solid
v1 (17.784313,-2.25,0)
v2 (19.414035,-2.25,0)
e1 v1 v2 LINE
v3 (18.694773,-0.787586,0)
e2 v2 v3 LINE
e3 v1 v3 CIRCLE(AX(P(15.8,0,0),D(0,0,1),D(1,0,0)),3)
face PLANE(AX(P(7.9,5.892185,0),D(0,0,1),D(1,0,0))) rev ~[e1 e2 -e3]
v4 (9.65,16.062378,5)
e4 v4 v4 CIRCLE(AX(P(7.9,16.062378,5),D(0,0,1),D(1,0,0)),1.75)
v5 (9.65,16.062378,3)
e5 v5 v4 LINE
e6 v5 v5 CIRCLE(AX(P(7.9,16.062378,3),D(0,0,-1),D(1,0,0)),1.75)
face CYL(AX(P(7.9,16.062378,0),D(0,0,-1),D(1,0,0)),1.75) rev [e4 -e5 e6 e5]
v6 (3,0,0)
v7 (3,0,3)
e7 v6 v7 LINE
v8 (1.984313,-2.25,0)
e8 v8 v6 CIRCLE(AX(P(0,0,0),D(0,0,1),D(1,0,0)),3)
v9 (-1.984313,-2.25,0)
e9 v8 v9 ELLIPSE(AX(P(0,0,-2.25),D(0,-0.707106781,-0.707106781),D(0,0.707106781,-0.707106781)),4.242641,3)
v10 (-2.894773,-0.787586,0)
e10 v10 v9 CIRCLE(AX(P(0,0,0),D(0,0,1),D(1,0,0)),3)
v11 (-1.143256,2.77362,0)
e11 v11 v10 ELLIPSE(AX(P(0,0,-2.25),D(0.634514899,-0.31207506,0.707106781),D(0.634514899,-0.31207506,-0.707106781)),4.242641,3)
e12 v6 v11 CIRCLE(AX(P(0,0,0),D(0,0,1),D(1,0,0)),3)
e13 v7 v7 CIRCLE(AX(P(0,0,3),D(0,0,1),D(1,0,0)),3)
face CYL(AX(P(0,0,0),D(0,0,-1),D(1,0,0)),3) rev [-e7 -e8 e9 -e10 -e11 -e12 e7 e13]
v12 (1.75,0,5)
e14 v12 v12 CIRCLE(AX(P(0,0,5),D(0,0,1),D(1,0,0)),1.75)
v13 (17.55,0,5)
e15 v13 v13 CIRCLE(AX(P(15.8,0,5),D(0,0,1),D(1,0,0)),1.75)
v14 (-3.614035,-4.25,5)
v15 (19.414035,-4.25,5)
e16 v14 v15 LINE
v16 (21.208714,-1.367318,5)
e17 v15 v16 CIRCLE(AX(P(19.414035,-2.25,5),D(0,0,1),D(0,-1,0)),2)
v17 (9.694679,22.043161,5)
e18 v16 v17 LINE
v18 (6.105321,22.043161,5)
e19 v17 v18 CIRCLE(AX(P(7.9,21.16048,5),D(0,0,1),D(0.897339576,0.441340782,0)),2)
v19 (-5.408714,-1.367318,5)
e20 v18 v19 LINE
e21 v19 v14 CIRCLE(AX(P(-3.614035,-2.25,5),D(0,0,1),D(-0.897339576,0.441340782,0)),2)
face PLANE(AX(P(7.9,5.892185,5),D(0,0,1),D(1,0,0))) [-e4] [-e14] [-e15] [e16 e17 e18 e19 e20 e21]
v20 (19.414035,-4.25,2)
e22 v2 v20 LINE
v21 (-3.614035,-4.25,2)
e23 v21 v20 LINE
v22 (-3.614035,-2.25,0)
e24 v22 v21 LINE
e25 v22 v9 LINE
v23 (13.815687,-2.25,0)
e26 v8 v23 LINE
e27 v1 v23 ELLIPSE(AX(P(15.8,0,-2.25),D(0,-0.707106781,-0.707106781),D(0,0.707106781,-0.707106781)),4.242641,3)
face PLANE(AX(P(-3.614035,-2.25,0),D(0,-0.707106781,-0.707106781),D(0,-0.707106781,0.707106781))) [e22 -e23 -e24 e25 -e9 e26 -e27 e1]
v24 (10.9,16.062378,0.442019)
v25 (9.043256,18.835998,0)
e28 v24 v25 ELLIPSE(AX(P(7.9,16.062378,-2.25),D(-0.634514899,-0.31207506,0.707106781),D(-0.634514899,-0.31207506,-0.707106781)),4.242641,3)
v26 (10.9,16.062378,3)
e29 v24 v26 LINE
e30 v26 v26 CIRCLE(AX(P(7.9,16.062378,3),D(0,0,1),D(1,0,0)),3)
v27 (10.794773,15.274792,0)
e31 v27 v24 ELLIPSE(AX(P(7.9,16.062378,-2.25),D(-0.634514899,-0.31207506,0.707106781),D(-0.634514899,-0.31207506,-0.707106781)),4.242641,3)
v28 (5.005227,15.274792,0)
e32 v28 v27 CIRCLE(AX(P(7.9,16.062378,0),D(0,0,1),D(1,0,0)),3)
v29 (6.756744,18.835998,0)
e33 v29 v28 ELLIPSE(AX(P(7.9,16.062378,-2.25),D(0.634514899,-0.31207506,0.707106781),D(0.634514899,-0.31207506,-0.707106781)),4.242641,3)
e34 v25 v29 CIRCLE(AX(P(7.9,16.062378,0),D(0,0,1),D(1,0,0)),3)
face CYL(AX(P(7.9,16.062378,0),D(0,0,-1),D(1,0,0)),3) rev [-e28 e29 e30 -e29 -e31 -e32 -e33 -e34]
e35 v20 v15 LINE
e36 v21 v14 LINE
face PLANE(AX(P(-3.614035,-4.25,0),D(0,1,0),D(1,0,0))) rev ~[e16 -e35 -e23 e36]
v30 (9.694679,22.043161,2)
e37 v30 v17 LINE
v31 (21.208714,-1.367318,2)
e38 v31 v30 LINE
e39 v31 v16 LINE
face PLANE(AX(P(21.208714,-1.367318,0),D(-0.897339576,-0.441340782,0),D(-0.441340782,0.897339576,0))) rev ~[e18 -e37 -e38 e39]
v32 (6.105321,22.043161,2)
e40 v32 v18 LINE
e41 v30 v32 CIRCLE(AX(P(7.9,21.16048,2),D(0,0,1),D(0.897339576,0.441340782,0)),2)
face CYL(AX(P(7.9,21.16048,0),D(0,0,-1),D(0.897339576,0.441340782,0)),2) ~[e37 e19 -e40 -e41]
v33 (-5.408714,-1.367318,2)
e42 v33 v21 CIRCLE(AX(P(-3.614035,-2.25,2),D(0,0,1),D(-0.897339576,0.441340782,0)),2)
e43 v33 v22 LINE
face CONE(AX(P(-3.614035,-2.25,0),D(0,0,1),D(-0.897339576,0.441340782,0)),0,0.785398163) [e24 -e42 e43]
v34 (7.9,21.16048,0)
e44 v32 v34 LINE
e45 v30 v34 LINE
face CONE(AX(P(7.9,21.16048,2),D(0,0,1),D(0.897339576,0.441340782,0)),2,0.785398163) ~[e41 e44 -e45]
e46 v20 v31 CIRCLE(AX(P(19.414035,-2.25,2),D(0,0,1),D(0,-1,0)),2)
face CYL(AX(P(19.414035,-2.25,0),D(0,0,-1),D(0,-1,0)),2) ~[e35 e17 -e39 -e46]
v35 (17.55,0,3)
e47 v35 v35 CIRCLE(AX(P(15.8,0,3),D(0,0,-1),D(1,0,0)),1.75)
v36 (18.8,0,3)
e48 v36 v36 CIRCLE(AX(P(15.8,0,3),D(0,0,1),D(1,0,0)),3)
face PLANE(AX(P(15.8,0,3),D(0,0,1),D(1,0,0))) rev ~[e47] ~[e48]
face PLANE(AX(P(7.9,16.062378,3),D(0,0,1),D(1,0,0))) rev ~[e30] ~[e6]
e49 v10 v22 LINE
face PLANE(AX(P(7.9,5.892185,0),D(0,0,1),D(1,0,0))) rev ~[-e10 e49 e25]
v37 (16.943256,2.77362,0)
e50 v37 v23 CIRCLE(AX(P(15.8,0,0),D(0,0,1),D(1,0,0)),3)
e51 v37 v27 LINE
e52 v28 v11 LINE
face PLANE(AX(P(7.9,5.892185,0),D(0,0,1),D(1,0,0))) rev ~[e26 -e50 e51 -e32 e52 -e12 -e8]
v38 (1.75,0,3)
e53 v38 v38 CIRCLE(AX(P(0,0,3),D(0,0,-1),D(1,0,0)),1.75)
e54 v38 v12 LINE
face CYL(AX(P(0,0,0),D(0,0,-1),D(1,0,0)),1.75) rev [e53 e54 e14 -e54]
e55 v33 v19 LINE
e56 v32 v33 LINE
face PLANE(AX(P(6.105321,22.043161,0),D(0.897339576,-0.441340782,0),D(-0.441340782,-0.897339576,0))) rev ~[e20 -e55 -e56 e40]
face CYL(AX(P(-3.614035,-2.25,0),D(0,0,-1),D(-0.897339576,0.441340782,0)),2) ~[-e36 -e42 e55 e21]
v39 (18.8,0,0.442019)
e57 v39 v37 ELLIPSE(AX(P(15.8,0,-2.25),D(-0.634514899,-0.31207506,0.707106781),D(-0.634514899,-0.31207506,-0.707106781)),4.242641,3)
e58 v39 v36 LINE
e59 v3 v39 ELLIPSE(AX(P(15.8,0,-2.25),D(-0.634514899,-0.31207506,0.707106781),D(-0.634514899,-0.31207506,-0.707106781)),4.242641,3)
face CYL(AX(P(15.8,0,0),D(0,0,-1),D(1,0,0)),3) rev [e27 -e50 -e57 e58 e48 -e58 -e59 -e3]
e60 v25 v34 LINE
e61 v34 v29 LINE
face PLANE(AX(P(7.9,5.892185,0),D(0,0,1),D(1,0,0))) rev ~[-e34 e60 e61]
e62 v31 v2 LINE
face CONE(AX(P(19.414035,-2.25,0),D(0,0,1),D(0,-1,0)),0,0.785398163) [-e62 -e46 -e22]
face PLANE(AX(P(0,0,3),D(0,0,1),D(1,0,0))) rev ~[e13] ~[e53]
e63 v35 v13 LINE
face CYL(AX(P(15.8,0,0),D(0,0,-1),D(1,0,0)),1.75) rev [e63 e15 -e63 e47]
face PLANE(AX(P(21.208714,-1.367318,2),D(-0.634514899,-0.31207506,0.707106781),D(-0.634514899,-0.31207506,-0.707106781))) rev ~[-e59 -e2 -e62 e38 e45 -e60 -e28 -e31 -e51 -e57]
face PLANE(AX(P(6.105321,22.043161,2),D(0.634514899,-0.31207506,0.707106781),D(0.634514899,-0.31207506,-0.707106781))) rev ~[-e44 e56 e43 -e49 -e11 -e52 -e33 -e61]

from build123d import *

# Parameters (mm, degrees)
F0_R         = 1.75
F1_DEPTH     = 5
F2_R         = 3
F3_DEPTH     = 3
F4_T1_DEPTH  = 23.0280702819
F4_T3_DEPTH  = 26.0887631675
F4_T5_DEPTH  = 26.0887631675
F4_T8_ANGLE  = 116.1894596418
F4_T10_ANGLE = 116.1894596418
F4_T12_ANGLE = 127.6210807165


# Not quite as in the source:
# - a fillet or chamfer that OpenCascade refuses, or shapes differently, is made with other operations: its cross-section is extruded or revolved along the edge and cut away or added


with BuildPart() as f1:
    # F0 (on Top) → F1 (new body)
    with BuildSketch(Plane.XY):
        with BuildLine():
            Line((6.1053208487, 22.0431612343), (-5.4087142923, -1.3673184358))
            ThreePointArc((-5.4087142923, -1.3673184358), (-5.3118812954, -3.3070328452), (-3.6140351409, -4.25))
            Line((-3.6140351409, -4.25), (19.4140351409, -4.25))
            ThreePointArc((19.4140351409, -4.25), (21.1118812954, -3.3070328452), (21.2087142923, -1.3673184358))
            Line((21.2087142923, -1.3673184358), (9.6946791513, 22.0431612343))
            ThreePointArc((9.6946791513, 22.0431612343), (7.9, 23.16047967), (6.1053208487, 22.0431612343))
        make_face()
        Circle(F0_R, mode=Mode.SUBTRACT)
        with Locations((15.8, 0)):
            Circle(F0_R, mode=Mode.SUBTRACT)
        with Locations((7.9, 16.0623784042)):
            Circle(F0_R, mode=Mode.SUBTRACT)
    extrude(amount=F1_DEPTH)

    # F2 (on Top) → F3 (cut)
    with BuildSketch(Plane.XY):
        with Locations((15.8, 0)):
            Circle(F2_R)
        Circle(F2_R)
        with Locations((7.9, 16.0623784042)):
            Circle(F2_R)
    extrude(amount=F3_DEPTH, mode=Mode.SUBTRACT)

    # F4: chamfer of 2 on 1 edges, made by hand

    # F4_s2 → F4_t1 (cut)
    with BuildSketch(Plane.YZ.offset(-3.6140351409)):
        Polygon((-2.25, 0), (-4.25, 2), (-4.25, 0), align=None)
    extrude(amount=F4_T1_DEPTH, mode=Mode.SUBTRACT)

    # F4_s4 → F4_t3 (cut)
    with BuildSketch(Plane(origin=(4.672571734, -9.5003310521, 0), x_dir=(0, 0, 1), z_dir=(-0.4413407821, 0.8973395757, 0))):
        Polygon((2, 18.4279652953), (0, 16.4279652953), (0, 18.4279652953), align=None)
    extrude(amount=F4_T3_DEPTH, mode=Mode.SUBTRACT)

    # F4_s6 → F4_t5 (cut)
    with BuildSketch(Plane(origin=(9.9190140452, 20.1674629103, 0), x_dir=(0, 0, 1), z_dir=(-0.4413407821, -0.8973395757, 0))):
        Polygon((2, 4.25), (0, 2.25), (0, 4.25), align=None)
    extrude(amount=F4_T5_DEPTH, mode=Mode.SUBTRACT)

    # F4_s7 → F4_t8 (revolve, cut)
    with BuildSketch(Plane(origin=(-1.5950210957, -3.2430167598, 0), x_dir=(0, 0, 1), z_dir=(0.4413407821, 0.8973395757, 0))):
        Polygon((0, -2.25), (2, -4.25), (0, -4.25), align=None)
    revolve(axis=Axis((-3.6140351409, -2.25, 0), (0, 0, 1)), revolution_arc=F4_T8_ANGLE, mode=Mode.SUBTRACT)

    # F4_s9 → F4_t10 (revolve, cut)
    with BuildSketch(Plane.YZ.offset(19.4140351409)):
        Polygon((-2.25, 0), (-4.25, 2), (-4.25, 0), align=None)
    revolve(axis=Axis((19.4140351409, -2.25, 0), (0, 0, 1)), revolution_arc=F4_T10_ANGLE, mode=Mode.SUBTRACT)

    # F4_s11 → F4_t12 (revolve, cut)
    with BuildSketch(Plane(origin=(-6.841463407, 13.9101486179, 0), x_dir=(0, 0, 1), z_dir=(0.4413407821, -0.8973395757, 0))):
        Polygon((2, -18.4279652953), (0, -16.4279652953), (0, -18.4279652953), align=None)
    revolve(axis=Axis((7.9, 21.16047967, 0), (0, 0, 1)), revolution_arc=F4_T12_ANGLE, mode=Mode.SUBTRACT)


solid = f1.part
